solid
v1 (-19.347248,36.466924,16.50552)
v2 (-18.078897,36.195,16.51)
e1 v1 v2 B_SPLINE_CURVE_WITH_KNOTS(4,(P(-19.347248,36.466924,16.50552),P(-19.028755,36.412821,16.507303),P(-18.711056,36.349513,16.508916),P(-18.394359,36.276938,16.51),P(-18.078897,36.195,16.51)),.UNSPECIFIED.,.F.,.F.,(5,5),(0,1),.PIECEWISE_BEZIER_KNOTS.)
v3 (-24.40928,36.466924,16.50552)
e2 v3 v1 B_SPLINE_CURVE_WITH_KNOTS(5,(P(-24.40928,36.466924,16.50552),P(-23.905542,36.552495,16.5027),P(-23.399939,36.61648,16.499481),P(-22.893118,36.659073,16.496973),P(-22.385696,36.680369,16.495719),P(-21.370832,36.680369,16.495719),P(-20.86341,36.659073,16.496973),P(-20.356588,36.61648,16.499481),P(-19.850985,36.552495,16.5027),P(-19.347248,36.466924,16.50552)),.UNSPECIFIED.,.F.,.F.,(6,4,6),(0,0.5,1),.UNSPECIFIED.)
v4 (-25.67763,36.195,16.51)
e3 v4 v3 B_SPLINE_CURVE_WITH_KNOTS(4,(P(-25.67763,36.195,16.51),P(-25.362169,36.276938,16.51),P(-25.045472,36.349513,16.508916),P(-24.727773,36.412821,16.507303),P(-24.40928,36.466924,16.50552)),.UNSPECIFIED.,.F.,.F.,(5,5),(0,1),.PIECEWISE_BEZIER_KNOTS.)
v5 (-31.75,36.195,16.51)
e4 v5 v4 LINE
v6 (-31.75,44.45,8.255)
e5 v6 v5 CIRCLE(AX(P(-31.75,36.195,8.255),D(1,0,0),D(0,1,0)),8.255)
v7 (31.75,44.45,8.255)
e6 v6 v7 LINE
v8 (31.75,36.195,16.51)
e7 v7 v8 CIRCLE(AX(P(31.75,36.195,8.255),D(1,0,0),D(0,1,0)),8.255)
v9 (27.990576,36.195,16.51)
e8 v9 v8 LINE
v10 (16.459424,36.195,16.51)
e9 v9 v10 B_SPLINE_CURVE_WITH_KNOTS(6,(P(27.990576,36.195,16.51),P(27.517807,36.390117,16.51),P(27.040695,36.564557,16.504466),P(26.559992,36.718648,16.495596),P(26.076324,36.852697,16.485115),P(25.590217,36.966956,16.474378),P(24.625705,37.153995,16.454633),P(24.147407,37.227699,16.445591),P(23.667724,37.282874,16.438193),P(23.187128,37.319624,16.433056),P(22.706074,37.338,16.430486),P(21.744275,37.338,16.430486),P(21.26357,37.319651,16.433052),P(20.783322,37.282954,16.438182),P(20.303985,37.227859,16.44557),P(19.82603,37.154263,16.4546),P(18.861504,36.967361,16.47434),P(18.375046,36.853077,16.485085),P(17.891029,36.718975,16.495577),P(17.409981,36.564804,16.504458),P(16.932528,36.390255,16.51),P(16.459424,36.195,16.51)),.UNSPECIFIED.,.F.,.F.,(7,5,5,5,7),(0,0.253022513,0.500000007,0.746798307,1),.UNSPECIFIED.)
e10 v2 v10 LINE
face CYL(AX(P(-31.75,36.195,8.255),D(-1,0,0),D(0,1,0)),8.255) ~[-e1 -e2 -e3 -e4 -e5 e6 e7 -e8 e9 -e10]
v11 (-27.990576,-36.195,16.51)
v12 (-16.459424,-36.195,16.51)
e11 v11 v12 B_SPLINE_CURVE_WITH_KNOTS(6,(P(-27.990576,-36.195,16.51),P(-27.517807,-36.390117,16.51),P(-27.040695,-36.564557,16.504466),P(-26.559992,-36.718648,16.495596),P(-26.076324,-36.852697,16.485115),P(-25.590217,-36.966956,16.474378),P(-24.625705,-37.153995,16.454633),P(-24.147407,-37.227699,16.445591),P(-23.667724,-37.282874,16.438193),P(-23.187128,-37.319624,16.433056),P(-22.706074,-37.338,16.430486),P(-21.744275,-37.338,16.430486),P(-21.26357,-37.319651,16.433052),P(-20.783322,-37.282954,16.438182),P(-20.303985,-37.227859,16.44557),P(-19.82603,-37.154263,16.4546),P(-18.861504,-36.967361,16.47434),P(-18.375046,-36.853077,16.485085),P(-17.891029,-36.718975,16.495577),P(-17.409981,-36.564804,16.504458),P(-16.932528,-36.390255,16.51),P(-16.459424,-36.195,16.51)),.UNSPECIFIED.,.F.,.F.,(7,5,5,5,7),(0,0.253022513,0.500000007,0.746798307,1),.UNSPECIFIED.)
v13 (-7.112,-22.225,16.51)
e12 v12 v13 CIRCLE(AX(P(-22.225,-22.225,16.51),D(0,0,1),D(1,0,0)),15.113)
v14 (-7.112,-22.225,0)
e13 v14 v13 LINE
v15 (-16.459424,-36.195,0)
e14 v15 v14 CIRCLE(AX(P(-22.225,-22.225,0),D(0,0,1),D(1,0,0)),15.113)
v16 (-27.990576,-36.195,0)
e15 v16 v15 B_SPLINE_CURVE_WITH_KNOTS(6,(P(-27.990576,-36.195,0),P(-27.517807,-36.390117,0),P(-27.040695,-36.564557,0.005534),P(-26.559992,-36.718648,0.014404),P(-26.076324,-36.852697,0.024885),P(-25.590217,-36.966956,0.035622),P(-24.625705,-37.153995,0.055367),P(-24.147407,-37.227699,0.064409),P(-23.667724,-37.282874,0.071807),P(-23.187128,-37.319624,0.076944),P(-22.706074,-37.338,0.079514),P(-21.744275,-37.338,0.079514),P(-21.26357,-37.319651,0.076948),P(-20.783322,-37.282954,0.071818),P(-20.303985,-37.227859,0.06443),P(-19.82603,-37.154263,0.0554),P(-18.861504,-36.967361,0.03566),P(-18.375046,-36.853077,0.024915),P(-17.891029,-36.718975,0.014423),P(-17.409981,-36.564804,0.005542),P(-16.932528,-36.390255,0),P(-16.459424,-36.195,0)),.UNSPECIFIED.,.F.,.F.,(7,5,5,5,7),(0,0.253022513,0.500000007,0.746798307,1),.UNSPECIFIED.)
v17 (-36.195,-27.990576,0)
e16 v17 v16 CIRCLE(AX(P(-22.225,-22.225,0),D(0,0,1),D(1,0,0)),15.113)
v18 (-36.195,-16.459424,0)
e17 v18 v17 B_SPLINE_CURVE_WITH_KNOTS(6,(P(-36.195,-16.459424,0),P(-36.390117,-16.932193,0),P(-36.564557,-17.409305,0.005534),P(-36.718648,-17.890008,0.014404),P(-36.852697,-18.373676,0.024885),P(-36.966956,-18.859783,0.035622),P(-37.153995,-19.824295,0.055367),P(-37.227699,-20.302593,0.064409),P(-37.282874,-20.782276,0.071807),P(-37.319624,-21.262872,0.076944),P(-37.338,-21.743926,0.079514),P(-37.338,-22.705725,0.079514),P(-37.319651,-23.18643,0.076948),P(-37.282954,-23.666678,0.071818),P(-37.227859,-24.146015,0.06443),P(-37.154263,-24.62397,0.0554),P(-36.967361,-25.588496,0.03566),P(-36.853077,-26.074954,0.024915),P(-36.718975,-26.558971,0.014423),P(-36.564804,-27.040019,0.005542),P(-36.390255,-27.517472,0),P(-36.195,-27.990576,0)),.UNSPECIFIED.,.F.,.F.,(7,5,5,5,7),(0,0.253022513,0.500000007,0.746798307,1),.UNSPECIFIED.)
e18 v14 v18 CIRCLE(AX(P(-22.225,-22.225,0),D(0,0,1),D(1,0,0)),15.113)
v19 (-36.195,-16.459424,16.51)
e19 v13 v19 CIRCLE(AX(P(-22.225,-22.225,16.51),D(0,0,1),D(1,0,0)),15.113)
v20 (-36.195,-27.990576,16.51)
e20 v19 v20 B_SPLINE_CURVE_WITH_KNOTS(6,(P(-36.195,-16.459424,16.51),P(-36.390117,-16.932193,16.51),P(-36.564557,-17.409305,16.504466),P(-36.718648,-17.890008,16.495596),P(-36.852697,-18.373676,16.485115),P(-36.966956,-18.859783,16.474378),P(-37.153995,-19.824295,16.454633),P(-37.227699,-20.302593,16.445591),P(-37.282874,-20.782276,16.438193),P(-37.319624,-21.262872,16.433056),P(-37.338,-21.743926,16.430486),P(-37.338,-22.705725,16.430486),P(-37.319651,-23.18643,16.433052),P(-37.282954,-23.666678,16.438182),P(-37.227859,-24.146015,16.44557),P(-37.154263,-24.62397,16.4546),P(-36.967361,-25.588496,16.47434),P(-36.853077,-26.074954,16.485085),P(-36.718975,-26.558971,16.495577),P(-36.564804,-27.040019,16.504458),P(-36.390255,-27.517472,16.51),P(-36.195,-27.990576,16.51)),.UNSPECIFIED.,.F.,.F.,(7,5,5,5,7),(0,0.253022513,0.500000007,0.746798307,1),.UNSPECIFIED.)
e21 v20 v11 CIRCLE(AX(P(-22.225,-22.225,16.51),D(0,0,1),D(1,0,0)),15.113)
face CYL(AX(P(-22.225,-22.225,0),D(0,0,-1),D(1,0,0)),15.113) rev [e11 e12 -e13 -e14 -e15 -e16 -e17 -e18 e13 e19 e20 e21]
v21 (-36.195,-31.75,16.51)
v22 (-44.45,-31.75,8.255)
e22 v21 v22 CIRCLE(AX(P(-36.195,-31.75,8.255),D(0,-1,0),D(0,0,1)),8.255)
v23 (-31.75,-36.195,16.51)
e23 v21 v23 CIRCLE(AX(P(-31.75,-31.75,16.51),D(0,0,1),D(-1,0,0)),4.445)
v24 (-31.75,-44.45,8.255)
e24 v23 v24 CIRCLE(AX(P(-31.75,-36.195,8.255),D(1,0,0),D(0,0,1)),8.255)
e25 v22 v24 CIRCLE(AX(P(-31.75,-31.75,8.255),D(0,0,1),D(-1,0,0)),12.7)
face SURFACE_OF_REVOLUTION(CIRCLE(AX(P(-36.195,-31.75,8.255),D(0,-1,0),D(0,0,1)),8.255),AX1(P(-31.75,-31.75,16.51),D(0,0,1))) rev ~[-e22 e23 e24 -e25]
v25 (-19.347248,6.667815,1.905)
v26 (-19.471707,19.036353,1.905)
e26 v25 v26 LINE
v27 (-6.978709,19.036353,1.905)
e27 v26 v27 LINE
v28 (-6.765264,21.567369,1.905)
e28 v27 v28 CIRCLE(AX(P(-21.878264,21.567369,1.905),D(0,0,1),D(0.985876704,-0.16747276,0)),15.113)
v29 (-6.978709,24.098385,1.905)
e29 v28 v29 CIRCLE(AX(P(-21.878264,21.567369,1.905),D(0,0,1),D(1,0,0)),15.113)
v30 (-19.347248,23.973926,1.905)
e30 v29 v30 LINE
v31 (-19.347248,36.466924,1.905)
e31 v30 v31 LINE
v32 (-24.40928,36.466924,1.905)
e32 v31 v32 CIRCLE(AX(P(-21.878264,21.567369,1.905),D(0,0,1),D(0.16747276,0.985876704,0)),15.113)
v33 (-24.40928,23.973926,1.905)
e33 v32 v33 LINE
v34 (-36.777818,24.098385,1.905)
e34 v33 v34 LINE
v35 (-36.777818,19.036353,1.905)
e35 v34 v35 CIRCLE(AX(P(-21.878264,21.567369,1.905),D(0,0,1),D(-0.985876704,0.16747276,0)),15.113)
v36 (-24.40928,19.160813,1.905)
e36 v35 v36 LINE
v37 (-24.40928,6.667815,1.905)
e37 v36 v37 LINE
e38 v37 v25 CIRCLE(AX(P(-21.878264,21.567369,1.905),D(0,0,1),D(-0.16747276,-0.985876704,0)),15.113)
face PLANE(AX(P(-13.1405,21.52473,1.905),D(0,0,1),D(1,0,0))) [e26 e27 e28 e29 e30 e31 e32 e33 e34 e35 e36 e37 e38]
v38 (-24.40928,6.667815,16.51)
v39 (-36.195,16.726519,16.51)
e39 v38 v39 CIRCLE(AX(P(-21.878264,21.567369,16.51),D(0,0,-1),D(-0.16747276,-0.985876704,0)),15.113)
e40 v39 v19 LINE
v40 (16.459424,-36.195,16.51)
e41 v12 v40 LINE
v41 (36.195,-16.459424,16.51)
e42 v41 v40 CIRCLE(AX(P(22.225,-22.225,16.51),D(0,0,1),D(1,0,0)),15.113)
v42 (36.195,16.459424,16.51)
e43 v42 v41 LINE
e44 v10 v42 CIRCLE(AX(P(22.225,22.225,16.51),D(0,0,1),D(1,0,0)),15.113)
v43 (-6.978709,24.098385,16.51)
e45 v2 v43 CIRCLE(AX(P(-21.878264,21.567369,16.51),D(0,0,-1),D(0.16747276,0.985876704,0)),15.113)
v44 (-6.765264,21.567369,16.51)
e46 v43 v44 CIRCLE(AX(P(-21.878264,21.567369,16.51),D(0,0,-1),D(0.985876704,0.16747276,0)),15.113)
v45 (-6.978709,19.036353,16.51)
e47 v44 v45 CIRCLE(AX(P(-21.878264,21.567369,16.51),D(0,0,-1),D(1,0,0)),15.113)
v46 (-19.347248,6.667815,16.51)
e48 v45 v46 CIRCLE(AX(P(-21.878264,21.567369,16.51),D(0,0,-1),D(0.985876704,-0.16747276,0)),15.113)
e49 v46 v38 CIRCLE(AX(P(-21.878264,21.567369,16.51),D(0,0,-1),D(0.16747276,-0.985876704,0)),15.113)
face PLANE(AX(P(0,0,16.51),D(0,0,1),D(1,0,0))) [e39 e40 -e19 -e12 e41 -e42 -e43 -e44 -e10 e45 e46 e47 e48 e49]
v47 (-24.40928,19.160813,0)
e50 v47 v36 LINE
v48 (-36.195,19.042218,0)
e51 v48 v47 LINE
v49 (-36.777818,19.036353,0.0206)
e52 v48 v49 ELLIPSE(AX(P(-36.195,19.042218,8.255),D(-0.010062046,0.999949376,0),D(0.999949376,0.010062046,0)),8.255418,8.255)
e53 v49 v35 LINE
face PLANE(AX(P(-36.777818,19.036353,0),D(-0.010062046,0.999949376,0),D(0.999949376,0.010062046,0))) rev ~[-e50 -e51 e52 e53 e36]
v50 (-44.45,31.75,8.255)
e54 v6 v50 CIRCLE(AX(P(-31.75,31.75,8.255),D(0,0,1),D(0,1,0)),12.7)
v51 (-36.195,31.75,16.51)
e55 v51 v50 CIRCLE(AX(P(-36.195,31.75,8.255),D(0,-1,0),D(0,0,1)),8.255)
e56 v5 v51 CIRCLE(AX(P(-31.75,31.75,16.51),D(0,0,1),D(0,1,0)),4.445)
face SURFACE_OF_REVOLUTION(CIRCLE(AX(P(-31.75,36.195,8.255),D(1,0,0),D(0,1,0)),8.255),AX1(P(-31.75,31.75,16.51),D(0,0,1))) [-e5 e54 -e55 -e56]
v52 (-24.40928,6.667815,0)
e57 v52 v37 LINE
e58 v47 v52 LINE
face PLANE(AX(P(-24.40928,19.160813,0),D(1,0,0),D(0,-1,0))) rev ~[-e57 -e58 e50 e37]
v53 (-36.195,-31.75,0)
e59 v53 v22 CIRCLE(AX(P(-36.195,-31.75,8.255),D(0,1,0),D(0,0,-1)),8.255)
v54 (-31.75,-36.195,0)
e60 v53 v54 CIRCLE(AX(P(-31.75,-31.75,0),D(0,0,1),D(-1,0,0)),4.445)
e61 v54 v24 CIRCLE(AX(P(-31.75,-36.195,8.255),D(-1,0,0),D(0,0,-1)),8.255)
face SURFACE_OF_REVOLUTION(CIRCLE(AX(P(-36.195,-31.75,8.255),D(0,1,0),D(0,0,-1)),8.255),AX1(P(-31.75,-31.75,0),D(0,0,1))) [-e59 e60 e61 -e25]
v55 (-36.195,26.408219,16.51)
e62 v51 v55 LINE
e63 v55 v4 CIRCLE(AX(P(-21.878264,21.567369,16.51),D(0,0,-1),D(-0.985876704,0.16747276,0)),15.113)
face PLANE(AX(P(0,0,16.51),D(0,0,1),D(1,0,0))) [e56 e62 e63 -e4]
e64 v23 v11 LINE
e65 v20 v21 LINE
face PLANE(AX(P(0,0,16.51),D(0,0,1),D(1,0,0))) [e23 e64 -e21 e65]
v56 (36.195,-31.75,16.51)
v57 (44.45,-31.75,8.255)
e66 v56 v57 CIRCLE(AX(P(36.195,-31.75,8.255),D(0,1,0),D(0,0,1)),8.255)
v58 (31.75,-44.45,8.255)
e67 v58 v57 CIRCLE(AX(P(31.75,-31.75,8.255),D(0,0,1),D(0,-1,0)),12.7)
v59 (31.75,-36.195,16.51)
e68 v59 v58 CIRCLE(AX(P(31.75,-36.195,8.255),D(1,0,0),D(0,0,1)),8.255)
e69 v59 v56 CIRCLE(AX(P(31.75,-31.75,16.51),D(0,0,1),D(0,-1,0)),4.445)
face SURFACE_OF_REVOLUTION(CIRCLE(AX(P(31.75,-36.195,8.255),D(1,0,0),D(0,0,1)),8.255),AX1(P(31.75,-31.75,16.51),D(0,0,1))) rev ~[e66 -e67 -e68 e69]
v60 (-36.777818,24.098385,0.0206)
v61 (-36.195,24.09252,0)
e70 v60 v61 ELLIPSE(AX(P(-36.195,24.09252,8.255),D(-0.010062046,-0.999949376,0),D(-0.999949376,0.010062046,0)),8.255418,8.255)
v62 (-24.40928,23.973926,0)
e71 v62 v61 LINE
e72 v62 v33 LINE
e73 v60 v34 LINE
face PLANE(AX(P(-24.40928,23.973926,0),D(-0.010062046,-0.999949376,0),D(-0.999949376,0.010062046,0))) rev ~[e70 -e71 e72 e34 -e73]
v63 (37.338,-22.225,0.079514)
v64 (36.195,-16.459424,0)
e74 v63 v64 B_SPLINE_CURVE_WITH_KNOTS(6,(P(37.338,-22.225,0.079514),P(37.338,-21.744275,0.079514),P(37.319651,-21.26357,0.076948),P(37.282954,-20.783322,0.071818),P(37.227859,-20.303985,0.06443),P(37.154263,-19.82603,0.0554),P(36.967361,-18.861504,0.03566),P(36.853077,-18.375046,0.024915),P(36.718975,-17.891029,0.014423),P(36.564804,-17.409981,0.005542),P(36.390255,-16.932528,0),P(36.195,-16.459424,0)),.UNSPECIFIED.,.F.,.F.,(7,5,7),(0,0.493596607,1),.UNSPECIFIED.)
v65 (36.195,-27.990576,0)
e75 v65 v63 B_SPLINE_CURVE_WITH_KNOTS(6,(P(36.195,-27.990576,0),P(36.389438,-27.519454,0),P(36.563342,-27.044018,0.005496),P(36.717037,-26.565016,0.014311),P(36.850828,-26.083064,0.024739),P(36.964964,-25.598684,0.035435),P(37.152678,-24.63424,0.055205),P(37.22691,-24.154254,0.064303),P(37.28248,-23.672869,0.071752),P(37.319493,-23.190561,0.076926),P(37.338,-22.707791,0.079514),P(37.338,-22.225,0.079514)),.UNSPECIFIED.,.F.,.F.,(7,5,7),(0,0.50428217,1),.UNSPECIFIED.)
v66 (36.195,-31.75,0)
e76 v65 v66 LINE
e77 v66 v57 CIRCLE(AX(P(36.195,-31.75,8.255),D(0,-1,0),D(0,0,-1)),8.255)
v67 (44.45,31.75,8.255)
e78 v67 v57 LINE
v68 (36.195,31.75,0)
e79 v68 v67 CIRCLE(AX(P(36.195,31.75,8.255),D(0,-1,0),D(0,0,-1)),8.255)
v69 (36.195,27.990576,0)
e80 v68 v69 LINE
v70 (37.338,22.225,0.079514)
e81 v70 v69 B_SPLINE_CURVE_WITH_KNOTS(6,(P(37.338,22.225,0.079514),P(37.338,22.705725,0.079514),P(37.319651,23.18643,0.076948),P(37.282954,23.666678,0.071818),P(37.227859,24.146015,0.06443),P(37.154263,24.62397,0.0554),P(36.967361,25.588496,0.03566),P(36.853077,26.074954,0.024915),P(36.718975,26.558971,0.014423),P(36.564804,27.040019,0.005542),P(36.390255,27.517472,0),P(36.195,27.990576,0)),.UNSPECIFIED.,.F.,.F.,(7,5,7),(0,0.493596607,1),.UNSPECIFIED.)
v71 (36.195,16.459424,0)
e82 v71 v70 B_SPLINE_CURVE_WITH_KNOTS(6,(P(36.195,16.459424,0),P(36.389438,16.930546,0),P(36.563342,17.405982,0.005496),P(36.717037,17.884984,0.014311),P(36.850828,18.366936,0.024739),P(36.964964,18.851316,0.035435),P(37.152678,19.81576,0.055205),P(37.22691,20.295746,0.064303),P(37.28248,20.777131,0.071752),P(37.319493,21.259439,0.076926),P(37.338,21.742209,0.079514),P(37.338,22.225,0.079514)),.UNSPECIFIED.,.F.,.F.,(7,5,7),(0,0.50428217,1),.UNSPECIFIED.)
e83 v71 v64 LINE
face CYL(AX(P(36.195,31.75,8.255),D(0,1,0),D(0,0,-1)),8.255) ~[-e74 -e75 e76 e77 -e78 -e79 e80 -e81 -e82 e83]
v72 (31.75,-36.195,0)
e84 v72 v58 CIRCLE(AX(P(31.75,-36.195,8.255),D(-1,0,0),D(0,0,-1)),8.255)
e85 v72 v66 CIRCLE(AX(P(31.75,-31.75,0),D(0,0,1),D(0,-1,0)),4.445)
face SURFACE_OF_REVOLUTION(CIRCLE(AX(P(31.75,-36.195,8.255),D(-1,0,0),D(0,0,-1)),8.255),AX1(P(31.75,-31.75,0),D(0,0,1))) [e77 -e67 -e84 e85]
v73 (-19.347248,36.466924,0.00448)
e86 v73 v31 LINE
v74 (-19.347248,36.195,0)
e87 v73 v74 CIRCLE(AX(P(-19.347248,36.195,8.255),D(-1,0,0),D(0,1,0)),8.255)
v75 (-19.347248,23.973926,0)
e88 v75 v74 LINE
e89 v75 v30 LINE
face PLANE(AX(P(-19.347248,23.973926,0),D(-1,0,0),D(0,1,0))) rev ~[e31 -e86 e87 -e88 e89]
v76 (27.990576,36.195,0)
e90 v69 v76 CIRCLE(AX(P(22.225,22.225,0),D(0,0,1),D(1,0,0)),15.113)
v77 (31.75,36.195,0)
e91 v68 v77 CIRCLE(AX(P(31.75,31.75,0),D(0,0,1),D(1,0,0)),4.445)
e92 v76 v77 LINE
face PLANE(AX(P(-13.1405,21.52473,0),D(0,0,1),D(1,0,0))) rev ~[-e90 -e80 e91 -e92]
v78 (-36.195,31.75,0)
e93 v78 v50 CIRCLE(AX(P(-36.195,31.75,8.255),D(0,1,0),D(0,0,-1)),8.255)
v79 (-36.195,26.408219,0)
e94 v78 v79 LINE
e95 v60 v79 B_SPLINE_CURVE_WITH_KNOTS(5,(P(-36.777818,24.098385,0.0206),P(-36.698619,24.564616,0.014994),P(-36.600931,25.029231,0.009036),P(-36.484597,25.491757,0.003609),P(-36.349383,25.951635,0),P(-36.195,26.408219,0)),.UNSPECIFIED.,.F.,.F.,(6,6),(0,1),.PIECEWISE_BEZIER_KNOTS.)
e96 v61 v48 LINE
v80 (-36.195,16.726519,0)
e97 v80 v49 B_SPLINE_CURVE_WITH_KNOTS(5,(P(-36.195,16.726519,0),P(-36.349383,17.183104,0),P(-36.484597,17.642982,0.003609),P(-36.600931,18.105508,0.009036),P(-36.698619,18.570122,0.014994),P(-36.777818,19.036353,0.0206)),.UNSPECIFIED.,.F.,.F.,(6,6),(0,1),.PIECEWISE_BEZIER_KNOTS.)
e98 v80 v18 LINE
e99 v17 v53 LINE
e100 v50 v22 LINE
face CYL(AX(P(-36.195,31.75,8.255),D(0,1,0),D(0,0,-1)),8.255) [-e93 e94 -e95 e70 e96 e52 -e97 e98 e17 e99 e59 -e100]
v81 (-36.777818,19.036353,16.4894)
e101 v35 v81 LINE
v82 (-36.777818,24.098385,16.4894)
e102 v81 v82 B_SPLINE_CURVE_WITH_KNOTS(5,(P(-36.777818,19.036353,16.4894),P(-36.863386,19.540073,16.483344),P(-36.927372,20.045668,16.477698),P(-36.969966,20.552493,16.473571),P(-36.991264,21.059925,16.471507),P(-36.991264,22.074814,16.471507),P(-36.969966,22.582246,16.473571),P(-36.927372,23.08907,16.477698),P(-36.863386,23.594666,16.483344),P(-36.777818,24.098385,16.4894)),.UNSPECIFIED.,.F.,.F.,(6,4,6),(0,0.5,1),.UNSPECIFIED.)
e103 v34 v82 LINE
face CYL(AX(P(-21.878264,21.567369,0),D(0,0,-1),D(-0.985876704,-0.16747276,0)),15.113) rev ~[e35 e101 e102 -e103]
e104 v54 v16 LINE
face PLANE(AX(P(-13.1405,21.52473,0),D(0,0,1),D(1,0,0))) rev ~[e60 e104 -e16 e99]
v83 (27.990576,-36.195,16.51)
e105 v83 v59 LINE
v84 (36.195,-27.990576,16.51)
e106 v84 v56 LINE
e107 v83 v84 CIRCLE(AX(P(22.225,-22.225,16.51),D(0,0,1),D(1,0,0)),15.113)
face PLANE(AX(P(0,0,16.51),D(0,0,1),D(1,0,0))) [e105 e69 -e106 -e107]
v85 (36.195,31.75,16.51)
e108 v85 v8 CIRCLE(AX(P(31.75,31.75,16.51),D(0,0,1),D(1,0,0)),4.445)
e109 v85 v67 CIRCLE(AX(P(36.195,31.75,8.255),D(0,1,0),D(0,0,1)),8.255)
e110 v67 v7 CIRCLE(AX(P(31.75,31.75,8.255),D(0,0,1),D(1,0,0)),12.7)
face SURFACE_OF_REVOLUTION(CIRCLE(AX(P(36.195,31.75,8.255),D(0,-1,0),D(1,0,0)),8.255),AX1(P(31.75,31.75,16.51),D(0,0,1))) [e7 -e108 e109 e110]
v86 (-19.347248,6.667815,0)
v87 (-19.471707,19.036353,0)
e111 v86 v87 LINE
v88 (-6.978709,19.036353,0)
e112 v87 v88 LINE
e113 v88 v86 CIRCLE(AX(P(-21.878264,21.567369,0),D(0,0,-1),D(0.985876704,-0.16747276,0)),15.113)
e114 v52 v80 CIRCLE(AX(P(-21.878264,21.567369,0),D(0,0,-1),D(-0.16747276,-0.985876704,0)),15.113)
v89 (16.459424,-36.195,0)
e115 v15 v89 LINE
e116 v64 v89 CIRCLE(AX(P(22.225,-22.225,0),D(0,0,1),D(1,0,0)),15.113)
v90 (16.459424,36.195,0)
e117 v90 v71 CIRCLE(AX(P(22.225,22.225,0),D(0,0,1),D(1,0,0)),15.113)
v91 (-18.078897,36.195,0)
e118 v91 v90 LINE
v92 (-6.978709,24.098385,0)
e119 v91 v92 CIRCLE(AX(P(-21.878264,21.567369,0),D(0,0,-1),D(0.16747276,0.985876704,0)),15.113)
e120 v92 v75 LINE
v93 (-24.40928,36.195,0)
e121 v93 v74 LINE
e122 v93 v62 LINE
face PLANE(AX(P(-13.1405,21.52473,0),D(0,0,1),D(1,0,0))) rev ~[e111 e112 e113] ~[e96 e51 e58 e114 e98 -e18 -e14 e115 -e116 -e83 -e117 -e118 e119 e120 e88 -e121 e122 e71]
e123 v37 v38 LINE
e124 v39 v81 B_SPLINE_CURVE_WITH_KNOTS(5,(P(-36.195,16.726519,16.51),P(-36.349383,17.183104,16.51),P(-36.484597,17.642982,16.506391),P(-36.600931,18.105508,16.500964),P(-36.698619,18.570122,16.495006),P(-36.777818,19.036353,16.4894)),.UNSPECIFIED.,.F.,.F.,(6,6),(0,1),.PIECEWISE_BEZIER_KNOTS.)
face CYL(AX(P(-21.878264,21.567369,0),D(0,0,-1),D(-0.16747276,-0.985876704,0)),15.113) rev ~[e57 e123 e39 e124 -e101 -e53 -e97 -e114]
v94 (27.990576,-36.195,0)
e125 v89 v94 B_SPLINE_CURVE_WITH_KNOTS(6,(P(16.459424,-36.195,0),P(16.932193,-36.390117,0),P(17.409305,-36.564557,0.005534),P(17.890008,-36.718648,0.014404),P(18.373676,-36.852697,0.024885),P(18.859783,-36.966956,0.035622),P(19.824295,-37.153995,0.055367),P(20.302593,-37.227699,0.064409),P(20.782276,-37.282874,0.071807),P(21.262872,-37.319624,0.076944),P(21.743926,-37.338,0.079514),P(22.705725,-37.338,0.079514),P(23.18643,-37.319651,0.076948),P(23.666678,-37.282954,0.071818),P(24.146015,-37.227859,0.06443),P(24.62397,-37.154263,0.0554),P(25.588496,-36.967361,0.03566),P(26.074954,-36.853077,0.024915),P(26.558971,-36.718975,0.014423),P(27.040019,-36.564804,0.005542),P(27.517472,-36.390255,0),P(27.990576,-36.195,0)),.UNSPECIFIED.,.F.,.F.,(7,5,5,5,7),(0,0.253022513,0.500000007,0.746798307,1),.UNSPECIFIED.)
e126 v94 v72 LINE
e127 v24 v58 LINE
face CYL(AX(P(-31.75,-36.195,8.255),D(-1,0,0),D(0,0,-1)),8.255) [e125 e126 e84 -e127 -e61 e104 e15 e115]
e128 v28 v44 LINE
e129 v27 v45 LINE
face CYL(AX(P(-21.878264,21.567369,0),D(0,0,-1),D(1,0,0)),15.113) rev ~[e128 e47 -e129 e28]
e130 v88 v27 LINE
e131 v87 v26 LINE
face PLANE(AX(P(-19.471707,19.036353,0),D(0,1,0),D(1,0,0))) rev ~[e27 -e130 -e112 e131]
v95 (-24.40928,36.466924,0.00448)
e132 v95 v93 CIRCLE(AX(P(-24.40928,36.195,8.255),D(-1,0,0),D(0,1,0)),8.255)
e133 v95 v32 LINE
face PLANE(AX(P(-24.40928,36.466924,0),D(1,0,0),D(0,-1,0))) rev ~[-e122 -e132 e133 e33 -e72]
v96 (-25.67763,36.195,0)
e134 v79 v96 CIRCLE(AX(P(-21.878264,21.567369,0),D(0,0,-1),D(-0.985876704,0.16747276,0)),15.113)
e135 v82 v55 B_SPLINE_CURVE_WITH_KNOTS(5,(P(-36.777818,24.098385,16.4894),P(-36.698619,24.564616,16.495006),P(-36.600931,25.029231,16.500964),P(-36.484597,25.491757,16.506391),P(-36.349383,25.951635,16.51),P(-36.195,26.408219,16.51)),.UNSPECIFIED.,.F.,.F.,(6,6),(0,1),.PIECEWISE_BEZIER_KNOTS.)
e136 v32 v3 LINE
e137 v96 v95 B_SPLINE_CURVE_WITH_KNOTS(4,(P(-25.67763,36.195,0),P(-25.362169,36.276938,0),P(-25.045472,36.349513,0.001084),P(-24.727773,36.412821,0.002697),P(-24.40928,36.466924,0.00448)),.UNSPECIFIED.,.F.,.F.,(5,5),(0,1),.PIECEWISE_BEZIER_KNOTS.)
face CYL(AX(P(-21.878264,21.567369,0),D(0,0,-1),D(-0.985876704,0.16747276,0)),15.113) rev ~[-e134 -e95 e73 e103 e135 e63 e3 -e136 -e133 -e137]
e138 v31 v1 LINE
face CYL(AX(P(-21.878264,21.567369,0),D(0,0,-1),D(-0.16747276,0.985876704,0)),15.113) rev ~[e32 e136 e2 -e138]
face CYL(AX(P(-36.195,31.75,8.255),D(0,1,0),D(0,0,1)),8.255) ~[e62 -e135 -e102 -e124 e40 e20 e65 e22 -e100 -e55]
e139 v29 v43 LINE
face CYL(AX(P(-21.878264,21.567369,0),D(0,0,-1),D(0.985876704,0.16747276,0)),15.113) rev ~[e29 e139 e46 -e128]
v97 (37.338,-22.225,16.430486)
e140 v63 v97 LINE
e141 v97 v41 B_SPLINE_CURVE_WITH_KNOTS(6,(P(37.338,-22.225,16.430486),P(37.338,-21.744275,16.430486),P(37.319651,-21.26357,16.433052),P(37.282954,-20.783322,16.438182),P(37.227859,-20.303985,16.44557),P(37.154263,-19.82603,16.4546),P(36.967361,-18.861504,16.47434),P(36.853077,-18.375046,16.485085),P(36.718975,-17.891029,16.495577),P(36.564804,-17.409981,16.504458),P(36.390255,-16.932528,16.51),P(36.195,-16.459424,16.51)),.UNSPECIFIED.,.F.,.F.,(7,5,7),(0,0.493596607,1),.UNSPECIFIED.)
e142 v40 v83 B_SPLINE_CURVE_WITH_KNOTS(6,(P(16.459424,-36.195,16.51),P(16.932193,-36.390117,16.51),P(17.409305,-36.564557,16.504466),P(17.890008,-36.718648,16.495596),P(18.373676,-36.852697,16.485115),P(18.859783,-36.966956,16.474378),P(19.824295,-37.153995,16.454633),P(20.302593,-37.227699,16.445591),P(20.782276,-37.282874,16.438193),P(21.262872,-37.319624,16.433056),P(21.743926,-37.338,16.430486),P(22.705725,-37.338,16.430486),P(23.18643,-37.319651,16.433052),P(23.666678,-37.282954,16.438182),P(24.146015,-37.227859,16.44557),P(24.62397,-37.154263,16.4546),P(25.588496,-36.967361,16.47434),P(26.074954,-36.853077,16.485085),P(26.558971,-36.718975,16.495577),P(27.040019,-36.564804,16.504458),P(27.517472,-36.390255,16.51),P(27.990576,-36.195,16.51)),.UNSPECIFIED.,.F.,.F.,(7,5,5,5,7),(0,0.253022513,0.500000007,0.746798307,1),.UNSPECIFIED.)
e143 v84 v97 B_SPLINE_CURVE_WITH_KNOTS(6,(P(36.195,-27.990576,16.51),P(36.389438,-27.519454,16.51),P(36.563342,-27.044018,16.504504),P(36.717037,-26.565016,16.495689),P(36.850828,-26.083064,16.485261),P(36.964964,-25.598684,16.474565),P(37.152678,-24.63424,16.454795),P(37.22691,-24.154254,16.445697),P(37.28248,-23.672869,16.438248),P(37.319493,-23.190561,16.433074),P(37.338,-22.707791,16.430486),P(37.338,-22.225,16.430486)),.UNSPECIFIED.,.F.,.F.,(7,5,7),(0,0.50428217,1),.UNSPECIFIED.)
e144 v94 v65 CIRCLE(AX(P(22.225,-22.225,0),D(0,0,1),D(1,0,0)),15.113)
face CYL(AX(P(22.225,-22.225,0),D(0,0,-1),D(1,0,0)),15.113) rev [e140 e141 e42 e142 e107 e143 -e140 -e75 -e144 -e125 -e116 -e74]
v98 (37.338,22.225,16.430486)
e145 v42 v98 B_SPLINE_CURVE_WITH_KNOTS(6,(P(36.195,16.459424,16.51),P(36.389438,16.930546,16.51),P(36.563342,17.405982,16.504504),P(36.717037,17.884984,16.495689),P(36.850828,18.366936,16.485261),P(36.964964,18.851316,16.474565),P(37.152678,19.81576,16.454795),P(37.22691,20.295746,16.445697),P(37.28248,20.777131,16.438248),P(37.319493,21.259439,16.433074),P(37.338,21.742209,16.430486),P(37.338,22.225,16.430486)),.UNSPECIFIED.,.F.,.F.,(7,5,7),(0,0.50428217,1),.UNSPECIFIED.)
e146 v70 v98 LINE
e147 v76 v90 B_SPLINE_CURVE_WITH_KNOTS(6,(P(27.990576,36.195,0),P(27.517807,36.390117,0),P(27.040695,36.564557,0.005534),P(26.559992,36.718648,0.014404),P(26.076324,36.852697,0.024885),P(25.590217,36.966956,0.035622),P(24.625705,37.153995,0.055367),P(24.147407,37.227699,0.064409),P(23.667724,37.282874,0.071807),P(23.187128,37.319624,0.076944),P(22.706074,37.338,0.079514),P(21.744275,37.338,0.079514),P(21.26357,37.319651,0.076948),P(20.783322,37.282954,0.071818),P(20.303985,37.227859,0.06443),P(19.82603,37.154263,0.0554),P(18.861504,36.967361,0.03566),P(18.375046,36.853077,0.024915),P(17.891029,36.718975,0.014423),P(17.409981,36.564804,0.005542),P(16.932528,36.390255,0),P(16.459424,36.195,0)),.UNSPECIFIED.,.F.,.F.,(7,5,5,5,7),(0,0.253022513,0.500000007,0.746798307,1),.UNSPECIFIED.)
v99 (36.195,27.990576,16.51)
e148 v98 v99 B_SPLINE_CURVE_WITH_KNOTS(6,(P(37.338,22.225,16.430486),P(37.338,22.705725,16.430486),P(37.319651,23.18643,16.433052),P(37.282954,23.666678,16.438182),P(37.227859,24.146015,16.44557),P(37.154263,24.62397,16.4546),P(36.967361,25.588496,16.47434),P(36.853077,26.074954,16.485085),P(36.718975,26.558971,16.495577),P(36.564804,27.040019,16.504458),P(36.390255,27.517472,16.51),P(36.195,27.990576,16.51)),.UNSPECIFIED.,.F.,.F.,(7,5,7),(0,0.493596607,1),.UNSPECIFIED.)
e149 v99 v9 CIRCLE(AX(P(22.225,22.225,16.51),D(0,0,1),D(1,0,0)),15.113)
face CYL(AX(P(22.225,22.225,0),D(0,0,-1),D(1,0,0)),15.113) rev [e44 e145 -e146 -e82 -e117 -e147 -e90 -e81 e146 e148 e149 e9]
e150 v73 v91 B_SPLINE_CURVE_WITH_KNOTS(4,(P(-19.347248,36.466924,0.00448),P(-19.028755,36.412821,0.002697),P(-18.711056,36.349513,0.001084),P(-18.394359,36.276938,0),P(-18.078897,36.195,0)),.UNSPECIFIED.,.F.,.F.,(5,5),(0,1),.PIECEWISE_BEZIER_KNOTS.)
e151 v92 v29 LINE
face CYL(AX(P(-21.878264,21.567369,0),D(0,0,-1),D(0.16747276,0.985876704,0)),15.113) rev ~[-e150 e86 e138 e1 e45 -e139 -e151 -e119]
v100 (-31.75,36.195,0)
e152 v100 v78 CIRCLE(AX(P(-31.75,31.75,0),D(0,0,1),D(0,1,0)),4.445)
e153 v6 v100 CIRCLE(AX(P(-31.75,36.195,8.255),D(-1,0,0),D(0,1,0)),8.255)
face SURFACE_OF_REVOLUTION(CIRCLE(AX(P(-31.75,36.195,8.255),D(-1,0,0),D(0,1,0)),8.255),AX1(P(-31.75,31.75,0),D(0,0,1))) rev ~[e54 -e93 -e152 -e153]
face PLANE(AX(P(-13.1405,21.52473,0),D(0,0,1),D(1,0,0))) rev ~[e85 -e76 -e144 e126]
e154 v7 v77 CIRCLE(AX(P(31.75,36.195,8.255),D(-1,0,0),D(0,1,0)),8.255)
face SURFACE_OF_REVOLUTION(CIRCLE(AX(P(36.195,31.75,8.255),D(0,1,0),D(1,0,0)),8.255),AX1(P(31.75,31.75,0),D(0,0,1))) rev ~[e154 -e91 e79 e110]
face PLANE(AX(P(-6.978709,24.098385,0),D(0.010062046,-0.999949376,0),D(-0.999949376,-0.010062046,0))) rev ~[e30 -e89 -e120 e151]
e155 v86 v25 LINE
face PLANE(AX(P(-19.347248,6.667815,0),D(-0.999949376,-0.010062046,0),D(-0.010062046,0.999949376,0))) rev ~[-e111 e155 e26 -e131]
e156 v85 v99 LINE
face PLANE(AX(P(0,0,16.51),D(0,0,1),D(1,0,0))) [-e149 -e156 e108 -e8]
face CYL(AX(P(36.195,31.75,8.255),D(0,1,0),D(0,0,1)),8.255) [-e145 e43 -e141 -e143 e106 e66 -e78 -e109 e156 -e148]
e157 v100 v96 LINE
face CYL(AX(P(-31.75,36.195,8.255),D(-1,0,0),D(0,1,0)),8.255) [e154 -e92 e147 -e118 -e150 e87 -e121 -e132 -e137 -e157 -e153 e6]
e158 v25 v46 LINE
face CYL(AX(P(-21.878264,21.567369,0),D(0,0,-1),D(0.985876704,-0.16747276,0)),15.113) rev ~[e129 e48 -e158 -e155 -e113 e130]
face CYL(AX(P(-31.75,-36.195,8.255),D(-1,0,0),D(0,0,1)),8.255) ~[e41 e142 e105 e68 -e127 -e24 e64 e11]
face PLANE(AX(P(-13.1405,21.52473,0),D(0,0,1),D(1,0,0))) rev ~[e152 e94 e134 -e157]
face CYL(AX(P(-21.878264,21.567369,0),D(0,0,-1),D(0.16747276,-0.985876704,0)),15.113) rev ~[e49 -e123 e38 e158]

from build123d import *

# Parameters (mm, degrees)
F0_R         = 15.113
F1_DEPTH     = 16.51
F2_DEPTH     = 1.905
F3_T1_DEPTH  = 63.5
F3_T3_DEPTH  = 63.5
F3_T6_ANGLE  = 90
F3_T8_ANGLE  = 90
F3_T10_ANGLE = 90
F3_T12_ANGLE = 90
F3_T14_ANGLE = 90
F3_T16_ANGLE = 90
F3_T18_ANGLE = 90
F3_T20_ANGLE = 90


# Not quite as in the source:
# - a fillet or chamfer that OpenCascade refuses, or shapes differently, is made with other operations: its cross-section is extruded or revolved along the edge and cut away or added


with BuildPart() as f1:
    # F0 (on Top) → F1 (new body)
    with BuildSketch(Plane.XY):
        with BuildLine():
            Line((31.75, 44.45), (-31.75, 44.45))
            ThreePointArc((-31.75, 44.45), (-40.7302561211, 40.7302561211), (-44.45, 31.75))
            Line((-44.45, 31.75), (-44.45, -31.75))
            ThreePointArc((-44.45, -31.75), (-40.7302561211, -40.7302561211), (-31.75, -44.45))
            Line((-31.75, -44.45), (31.75, -44.45))
            ThreePointArc((31.75, -44.45), (40.7302561211, -40.7302561211), (44.45, -31.75))
            Line((44.45, -31.75), (44.45, 31.75))
            ThreePointArc((44.45, 31.75), (40.7302561211, 40.7302561211), (31.75, 44.45))
        make_face()
        with Locations((-22.225, -22.225)):
            Circle(F0_R, mode=Mode.SUBTRACT)
        with Locations((22.225, -22.225)):
            Circle(F0_R, mode=Mode.SUBTRACT)
        with BuildLine():
            ThreePointArc((-6.9787090866, 24.098385063), (-6.8187195919, 22.8373692451), (-6.7652637085, 21.5673692451))
            ThreePointArc((-6.7652637085, 21.5673692451), (-6.8187195919, 20.2973692451), (-6.9787090866, 19.0363534272))
            ThreePointArc((-6.9787090866, 19.0363534272), (-11.1917589244, 10.880864461), (-19.3472478905, 6.6678146232))
            ThreePointArc((-19.3472478905, 6.6678146232), (-21.8782637085, 6.4543692451), (-24.4092795264, 6.6678146232))
            ThreePointArc((-24.4092795264, 6.6678146232), (-32.5647684925, 10.880864461), (-36.7778183303, 19.0363534272))
            ThreePointArc((-36.7778183303, 19.0363534272), (-36.9912637085, 21.5673692451), (-36.7778183303, 24.098385063))
            ThreePointArc((-36.7778183303, 24.098385063), (-32.5647684925, 32.2538740292), (-24.4092795264, 36.4669238669))
            ThreePointArc((-24.4092795264, 36.4669238669), (-21.8782637085, 36.6803692451), (-19.3472478905, 36.4669238669))
            ThreePointArc((-19.3472478905, 36.4669238669), (-11.1917589244, 32.2538740292), (-6.9787090866, 24.098385063))
        make_face(mode=Mode.SUBTRACT)
        with Locations((22.225, 22.225)):
            Circle(F0_R, mode=Mode.SUBTRACT)
    extrude(amount=F1_DEPTH)

    # F0 (on Top) → F2 (join)
    with BuildSketch(Plane.XY):
        with BuildLine():
            ThreePointArc((-6.9787090866, 19.0363534272), (-6.8187195919, 20.2973692451), (-6.7652637085, 21.5673692451))
            ThreePointArc((-6.7652637085, 21.5673692451), (-6.8187195919, 22.8373692451), (-6.9787090866, 24.098385063))
            Line((-6.9787090866, 24.098385063), (-19.3472478905, 23.9739259511))
            ThreePointArc((-19.3472478905, 23.9739259511), (-18.6350300602, 22.8631283867), (-18.3857637085, 21.5673692451))
            ThreePointArc((-18.3857637085, 21.5673692451), (-18.668711127, 20.1902968152), (-19.4717070024, 19.0363534272))
            Line((-19.4717070024, 19.0363534272), (-6.9787090866, 19.0363534272))
        make_face()
        with BuildLine():
            Line((-19.3472478905, 23.9739259511), (-19.3472478905, 36.4669238669))
            ThreePointArc((-19.3472478905, 36.4669238669), (-21.8782637085, 36.6803692451), (-24.4092795264, 36.4669238669))
            Line((-24.4092795264, 36.4669238669), (-24.4092795264, 23.9739259511))
            ThreePointArc((-24.4092795264, 23.9739259511), (-21.8782637085, 25.0598692451), (-19.3472478905, 23.9739259511))
        make_face()
        with BuildLine():
            ThreePointArc((-18.3857637085, 21.5673692451), (-18.6350300602, 22.8631283867), (-19.3472478905, 23.9739259511))
            ThreePointArc((-19.3472478905, 23.9739259511), (-21.8782637085, 25.0598692451), (-24.4092795264, 23.9739259511))
            ThreePointArc((-24.4092795264, 23.9739259511), (-25.3707637085, 21.5673692451), (-24.4092795264, 19.160812539))
            ThreePointArc((-24.4092795264, 19.160812539), (-21.9662695904, 18.0759782308), (-19.4717070024, 19.0363534272))
            ThreePointArc((-19.4717070024, 19.0363534272), (-18.668711127, 20.1902968152), (-18.3857637085, 21.5673692451))
        make_face()
        with BuildLine():
            ThreePointArc((-24.4092795264, 19.160812539), (-25.3707637085, 21.5673692451), (-24.4092795264, 23.9739259511))
            Line((-24.4092795264, 23.9739259511), (-36.7778183303, 24.098385063))
            ThreePointArc((-36.7778183303, 24.098385063), (-36.9912637085, 21.5673692451), (-36.7778183303, 19.0363534272))
            Line((-36.7778183303, 19.0363534272), (-24.4092795264, 19.160812539))
        make_face()
        with BuildLine():
            ThreePointArc((-24.4092795264, 6.6678146232), (-21.8782637085, 6.4543692451), (-19.3472478905, 6.6678146232))
            Line((-19.3472478905, 6.6678146232), (-19.4717070024, 19.0363534272))
            ThreePointArc((-19.4717070024, 19.0363534272), (-21.9662695904, 18.0759782308), (-24.4092795264, 19.160812539))
            Line((-24.4092795264, 19.160812539), (-24.4092795264, 6.6678146232))
        make_face()
    extrude(amount=F2_DEPTH)

    # F3: fillet of radius 8.255 on 3 edges, made by hand

    # F3_s2 → F3_t1 (cut)
    with BuildSketch(Plane.XZ.offset(-31.75)):
        with BuildLine():
            ThreePointArc((-36.195, 16.51), (-42.0321664787, 14.0921664787), (-44.45, 8.255))
            Line((-44.45, 8.255), (-44.45, 16.51))
            Line((-44.45, 16.51), (-36.195, 16.51))
        make_face()
        with BuildLine():
            ThreePointArc((36.195, 0), (42.0321664787, 2.4178335213), (44.45, 8.255))
            Line((44.45, 8.255), (44.45, 0))
            Line((44.45, 0), (36.195, 0))
        make_face()
        with BuildLine():
            ThreePointArc((-36.195, 0), (-42.0321664787, 2.4178335213), (-44.45, 8.255))
            Line((-44.45, 8.255), (-44.45, 0))
            Line((-44.45, 0), (-36.195, 0))
        make_face()
        with BuildLine():
            ThreePointArc((36.195, 16.51), (42.0321664787, 14.0921664787), (44.45, 8.255))
            Line((44.45, 8.255), (44.45, 16.51))
            Line((44.45, 16.51), (36.195, 16.51))
        make_face()
    extrude(amount=F3_T1_DEPTH, mode=Mode.SUBTRACT)

    # F3_s4 → F3_t3 (cut)
    with BuildSketch(Plane.YZ.offset(-31.75)):
        with BuildLine():
            ThreePointArc((-36.195, 0), (-42.0321664787, 2.4178335213), (-44.45, 8.255))
            Line((-44.45, 8.255), (-44.45, 0))
            Line((-44.45, 0), (-36.195, 0))
        make_face()
        with BuildLine():
            ThreePointArc((44.45, 8.255), (42.0321664787, 2.4178335213), (36.195, 0))
            Line((36.195, 0), (44.45, 0))
            Line((44.45, 0), (44.45, 8.255))
        make_face()
        with BuildLine():
            ThreePointArc((-36.195, 16.51), (-42.0321664787, 14.0921664787), (-44.45, 8.255))
            Line((-44.45, 8.255), (-44.45, 16.51))
            Line((-44.45, 16.51), (-36.195, 16.51))
        make_face()
        with BuildLine():
            ThreePointArc((44.45, 8.255), (42.0321664787, 14.0921664787), (36.195, 16.51))
            Line((36.195, 16.51), (44.45, 16.51))
            Line((44.45, 16.51), (44.45, 8.255))
        make_face()
    extrude(amount=F3_T3_DEPTH, mode=Mode.SUBTRACT)

    # F3_s5 → F3_t6 (revolve, cut)
    with BuildSketch(Plane.YZ.offset(-31.75)):
        with BuildLine():
            ThreePointArc((44.45, 8.255), (42.0321664787, 14.0921664787), (36.195, 16.51))
            Line((36.195, 16.51), (44.45, 16.51))
            Line((44.45, 16.51), (44.45, 8.255))
        make_face()
    revolve(axis=Axis((-31.75, 31.75, 16.51), (0, 0, 1)), revolution_arc=F3_T6_ANGLE, mode=Mode.SUBTRACT)

    # F3_s7 → F3_t8 (revolve, cut)
    with BuildSketch(Plane.XZ.offset(31.75)):
        with BuildLine():
            ThreePointArc((-36.195, 0), (-42.0321664787, 2.4178335213), (-44.45, 8.255))
            Line((-44.45, 8.255), (-44.45, 0))
            Line((-44.45, 0), (-36.195, 0))
        make_face()
    revolve(axis=Axis((-31.75, -31.75, 0), (0, 0, 1)), revolution_arc=F3_T8_ANGLE, mode=Mode.SUBTRACT)

    # F3_s9 → F3_t10 (revolve, cut)
    with BuildSketch(Plane.YZ.offset(31.75)):
        with BuildLine():
            ThreePointArc((-36.195, 0), (-42.0321664787, 2.4178335213), (-44.45, 8.255))
            Line((-44.45, 8.255), (-44.45, 0))
            Line((-44.45, 0), (-36.195, 0))
        make_face()
    revolve(axis=Axis((31.75, -31.75, 0), (0, 0, 1)), revolution_arc=F3_T10_ANGLE, mode=Mode.SUBTRACT)

    # F3_s11 → F3_t12 (revolve, cut)
    with BuildSketch(Plane.XZ.offset(-31.75)):
        with BuildLine():
            ThreePointArc((44.45, 8.255), (42.0321664787, 2.4178335213), (36.195, 0))
            Line((36.195, 0), (44.45, 0))
            Line((44.45, 0), (44.45, 8.255))
        make_face()
    revolve(axis=Axis((31.75, 31.75, 0), (0, 0, 1)), revolution_arc=F3_T12_ANGLE, mode=Mode.SUBTRACT)

    # F3_s13 → F3_t14 (revolve, cut)
    with BuildSketch(Plane.YZ.offset(-31.75)):
        with BuildLine():
            ThreePointArc((44.45, 8.255), (42.0321664787, 2.4178335213), (36.195, 0))
            Line((36.195, 0), (44.45, 0))
            Line((44.45, 0), (44.45, 8.255))
        make_face()
    revolve(axis=Axis((-31.75, 31.75, 0), (0, 0, 1)), revolution_arc=F3_T14_ANGLE, mode=Mode.SUBTRACT)

    # F3_s15 → F3_t16 (revolve, cut)
    with BuildSketch(Plane.XZ.offset(31.75)):
        with BuildLine():
            ThreePointArc((-36.195, 16.51), (-42.0321664787, 14.0921664787), (-44.45, 8.255))
            Line((-44.45, 8.255), (-44.45, 16.51))
            Line((-44.45, 16.51), (-36.195, 16.51))
        make_face()
    revolve(axis=Axis((-31.75, -31.75, 16.51), (0, 0, 1)), revolution_arc=F3_T16_ANGLE, mode=Mode.SUBTRACT)

    # F3_s17 → F3_t18 (revolve, cut)
    with BuildSketch(Plane.YZ.offset(31.75)):
        with BuildLine():
            ThreePointArc((-36.195, 16.51), (-42.0321664787, 14.0921664787), (-44.45, 8.255))
            Line((-44.45, 8.255), (-44.45, 16.51))
            Line((-44.45, 16.51), (-36.195, 16.51))
        make_face()
    revolve(axis=Axis((31.75, -31.75, 16.51), (0, 0, 1)), revolution_arc=F3_T18_ANGLE, mode=Mode.SUBTRACT)

    # F3_s19 → F3_t20 (revolve, cut)
    with BuildSketch(Plane.XZ.offset(-31.75)):
        with BuildLine():
            ThreePointArc((44.45, 8.255), (42.0321664787, 14.0921664787), (36.195, 16.51))
            Line((36.195, 16.51), (44.45, 16.51))
            Line((44.45, 16.51), (44.45, 8.255))
        make_face()
    revolve(axis=Axis((31.75, 31.75, 16.51), (0, 0, 1)), revolution_arc=F3_T20_ANGLE, mode=Mode.SUBTRACT)


solid = f1.part
